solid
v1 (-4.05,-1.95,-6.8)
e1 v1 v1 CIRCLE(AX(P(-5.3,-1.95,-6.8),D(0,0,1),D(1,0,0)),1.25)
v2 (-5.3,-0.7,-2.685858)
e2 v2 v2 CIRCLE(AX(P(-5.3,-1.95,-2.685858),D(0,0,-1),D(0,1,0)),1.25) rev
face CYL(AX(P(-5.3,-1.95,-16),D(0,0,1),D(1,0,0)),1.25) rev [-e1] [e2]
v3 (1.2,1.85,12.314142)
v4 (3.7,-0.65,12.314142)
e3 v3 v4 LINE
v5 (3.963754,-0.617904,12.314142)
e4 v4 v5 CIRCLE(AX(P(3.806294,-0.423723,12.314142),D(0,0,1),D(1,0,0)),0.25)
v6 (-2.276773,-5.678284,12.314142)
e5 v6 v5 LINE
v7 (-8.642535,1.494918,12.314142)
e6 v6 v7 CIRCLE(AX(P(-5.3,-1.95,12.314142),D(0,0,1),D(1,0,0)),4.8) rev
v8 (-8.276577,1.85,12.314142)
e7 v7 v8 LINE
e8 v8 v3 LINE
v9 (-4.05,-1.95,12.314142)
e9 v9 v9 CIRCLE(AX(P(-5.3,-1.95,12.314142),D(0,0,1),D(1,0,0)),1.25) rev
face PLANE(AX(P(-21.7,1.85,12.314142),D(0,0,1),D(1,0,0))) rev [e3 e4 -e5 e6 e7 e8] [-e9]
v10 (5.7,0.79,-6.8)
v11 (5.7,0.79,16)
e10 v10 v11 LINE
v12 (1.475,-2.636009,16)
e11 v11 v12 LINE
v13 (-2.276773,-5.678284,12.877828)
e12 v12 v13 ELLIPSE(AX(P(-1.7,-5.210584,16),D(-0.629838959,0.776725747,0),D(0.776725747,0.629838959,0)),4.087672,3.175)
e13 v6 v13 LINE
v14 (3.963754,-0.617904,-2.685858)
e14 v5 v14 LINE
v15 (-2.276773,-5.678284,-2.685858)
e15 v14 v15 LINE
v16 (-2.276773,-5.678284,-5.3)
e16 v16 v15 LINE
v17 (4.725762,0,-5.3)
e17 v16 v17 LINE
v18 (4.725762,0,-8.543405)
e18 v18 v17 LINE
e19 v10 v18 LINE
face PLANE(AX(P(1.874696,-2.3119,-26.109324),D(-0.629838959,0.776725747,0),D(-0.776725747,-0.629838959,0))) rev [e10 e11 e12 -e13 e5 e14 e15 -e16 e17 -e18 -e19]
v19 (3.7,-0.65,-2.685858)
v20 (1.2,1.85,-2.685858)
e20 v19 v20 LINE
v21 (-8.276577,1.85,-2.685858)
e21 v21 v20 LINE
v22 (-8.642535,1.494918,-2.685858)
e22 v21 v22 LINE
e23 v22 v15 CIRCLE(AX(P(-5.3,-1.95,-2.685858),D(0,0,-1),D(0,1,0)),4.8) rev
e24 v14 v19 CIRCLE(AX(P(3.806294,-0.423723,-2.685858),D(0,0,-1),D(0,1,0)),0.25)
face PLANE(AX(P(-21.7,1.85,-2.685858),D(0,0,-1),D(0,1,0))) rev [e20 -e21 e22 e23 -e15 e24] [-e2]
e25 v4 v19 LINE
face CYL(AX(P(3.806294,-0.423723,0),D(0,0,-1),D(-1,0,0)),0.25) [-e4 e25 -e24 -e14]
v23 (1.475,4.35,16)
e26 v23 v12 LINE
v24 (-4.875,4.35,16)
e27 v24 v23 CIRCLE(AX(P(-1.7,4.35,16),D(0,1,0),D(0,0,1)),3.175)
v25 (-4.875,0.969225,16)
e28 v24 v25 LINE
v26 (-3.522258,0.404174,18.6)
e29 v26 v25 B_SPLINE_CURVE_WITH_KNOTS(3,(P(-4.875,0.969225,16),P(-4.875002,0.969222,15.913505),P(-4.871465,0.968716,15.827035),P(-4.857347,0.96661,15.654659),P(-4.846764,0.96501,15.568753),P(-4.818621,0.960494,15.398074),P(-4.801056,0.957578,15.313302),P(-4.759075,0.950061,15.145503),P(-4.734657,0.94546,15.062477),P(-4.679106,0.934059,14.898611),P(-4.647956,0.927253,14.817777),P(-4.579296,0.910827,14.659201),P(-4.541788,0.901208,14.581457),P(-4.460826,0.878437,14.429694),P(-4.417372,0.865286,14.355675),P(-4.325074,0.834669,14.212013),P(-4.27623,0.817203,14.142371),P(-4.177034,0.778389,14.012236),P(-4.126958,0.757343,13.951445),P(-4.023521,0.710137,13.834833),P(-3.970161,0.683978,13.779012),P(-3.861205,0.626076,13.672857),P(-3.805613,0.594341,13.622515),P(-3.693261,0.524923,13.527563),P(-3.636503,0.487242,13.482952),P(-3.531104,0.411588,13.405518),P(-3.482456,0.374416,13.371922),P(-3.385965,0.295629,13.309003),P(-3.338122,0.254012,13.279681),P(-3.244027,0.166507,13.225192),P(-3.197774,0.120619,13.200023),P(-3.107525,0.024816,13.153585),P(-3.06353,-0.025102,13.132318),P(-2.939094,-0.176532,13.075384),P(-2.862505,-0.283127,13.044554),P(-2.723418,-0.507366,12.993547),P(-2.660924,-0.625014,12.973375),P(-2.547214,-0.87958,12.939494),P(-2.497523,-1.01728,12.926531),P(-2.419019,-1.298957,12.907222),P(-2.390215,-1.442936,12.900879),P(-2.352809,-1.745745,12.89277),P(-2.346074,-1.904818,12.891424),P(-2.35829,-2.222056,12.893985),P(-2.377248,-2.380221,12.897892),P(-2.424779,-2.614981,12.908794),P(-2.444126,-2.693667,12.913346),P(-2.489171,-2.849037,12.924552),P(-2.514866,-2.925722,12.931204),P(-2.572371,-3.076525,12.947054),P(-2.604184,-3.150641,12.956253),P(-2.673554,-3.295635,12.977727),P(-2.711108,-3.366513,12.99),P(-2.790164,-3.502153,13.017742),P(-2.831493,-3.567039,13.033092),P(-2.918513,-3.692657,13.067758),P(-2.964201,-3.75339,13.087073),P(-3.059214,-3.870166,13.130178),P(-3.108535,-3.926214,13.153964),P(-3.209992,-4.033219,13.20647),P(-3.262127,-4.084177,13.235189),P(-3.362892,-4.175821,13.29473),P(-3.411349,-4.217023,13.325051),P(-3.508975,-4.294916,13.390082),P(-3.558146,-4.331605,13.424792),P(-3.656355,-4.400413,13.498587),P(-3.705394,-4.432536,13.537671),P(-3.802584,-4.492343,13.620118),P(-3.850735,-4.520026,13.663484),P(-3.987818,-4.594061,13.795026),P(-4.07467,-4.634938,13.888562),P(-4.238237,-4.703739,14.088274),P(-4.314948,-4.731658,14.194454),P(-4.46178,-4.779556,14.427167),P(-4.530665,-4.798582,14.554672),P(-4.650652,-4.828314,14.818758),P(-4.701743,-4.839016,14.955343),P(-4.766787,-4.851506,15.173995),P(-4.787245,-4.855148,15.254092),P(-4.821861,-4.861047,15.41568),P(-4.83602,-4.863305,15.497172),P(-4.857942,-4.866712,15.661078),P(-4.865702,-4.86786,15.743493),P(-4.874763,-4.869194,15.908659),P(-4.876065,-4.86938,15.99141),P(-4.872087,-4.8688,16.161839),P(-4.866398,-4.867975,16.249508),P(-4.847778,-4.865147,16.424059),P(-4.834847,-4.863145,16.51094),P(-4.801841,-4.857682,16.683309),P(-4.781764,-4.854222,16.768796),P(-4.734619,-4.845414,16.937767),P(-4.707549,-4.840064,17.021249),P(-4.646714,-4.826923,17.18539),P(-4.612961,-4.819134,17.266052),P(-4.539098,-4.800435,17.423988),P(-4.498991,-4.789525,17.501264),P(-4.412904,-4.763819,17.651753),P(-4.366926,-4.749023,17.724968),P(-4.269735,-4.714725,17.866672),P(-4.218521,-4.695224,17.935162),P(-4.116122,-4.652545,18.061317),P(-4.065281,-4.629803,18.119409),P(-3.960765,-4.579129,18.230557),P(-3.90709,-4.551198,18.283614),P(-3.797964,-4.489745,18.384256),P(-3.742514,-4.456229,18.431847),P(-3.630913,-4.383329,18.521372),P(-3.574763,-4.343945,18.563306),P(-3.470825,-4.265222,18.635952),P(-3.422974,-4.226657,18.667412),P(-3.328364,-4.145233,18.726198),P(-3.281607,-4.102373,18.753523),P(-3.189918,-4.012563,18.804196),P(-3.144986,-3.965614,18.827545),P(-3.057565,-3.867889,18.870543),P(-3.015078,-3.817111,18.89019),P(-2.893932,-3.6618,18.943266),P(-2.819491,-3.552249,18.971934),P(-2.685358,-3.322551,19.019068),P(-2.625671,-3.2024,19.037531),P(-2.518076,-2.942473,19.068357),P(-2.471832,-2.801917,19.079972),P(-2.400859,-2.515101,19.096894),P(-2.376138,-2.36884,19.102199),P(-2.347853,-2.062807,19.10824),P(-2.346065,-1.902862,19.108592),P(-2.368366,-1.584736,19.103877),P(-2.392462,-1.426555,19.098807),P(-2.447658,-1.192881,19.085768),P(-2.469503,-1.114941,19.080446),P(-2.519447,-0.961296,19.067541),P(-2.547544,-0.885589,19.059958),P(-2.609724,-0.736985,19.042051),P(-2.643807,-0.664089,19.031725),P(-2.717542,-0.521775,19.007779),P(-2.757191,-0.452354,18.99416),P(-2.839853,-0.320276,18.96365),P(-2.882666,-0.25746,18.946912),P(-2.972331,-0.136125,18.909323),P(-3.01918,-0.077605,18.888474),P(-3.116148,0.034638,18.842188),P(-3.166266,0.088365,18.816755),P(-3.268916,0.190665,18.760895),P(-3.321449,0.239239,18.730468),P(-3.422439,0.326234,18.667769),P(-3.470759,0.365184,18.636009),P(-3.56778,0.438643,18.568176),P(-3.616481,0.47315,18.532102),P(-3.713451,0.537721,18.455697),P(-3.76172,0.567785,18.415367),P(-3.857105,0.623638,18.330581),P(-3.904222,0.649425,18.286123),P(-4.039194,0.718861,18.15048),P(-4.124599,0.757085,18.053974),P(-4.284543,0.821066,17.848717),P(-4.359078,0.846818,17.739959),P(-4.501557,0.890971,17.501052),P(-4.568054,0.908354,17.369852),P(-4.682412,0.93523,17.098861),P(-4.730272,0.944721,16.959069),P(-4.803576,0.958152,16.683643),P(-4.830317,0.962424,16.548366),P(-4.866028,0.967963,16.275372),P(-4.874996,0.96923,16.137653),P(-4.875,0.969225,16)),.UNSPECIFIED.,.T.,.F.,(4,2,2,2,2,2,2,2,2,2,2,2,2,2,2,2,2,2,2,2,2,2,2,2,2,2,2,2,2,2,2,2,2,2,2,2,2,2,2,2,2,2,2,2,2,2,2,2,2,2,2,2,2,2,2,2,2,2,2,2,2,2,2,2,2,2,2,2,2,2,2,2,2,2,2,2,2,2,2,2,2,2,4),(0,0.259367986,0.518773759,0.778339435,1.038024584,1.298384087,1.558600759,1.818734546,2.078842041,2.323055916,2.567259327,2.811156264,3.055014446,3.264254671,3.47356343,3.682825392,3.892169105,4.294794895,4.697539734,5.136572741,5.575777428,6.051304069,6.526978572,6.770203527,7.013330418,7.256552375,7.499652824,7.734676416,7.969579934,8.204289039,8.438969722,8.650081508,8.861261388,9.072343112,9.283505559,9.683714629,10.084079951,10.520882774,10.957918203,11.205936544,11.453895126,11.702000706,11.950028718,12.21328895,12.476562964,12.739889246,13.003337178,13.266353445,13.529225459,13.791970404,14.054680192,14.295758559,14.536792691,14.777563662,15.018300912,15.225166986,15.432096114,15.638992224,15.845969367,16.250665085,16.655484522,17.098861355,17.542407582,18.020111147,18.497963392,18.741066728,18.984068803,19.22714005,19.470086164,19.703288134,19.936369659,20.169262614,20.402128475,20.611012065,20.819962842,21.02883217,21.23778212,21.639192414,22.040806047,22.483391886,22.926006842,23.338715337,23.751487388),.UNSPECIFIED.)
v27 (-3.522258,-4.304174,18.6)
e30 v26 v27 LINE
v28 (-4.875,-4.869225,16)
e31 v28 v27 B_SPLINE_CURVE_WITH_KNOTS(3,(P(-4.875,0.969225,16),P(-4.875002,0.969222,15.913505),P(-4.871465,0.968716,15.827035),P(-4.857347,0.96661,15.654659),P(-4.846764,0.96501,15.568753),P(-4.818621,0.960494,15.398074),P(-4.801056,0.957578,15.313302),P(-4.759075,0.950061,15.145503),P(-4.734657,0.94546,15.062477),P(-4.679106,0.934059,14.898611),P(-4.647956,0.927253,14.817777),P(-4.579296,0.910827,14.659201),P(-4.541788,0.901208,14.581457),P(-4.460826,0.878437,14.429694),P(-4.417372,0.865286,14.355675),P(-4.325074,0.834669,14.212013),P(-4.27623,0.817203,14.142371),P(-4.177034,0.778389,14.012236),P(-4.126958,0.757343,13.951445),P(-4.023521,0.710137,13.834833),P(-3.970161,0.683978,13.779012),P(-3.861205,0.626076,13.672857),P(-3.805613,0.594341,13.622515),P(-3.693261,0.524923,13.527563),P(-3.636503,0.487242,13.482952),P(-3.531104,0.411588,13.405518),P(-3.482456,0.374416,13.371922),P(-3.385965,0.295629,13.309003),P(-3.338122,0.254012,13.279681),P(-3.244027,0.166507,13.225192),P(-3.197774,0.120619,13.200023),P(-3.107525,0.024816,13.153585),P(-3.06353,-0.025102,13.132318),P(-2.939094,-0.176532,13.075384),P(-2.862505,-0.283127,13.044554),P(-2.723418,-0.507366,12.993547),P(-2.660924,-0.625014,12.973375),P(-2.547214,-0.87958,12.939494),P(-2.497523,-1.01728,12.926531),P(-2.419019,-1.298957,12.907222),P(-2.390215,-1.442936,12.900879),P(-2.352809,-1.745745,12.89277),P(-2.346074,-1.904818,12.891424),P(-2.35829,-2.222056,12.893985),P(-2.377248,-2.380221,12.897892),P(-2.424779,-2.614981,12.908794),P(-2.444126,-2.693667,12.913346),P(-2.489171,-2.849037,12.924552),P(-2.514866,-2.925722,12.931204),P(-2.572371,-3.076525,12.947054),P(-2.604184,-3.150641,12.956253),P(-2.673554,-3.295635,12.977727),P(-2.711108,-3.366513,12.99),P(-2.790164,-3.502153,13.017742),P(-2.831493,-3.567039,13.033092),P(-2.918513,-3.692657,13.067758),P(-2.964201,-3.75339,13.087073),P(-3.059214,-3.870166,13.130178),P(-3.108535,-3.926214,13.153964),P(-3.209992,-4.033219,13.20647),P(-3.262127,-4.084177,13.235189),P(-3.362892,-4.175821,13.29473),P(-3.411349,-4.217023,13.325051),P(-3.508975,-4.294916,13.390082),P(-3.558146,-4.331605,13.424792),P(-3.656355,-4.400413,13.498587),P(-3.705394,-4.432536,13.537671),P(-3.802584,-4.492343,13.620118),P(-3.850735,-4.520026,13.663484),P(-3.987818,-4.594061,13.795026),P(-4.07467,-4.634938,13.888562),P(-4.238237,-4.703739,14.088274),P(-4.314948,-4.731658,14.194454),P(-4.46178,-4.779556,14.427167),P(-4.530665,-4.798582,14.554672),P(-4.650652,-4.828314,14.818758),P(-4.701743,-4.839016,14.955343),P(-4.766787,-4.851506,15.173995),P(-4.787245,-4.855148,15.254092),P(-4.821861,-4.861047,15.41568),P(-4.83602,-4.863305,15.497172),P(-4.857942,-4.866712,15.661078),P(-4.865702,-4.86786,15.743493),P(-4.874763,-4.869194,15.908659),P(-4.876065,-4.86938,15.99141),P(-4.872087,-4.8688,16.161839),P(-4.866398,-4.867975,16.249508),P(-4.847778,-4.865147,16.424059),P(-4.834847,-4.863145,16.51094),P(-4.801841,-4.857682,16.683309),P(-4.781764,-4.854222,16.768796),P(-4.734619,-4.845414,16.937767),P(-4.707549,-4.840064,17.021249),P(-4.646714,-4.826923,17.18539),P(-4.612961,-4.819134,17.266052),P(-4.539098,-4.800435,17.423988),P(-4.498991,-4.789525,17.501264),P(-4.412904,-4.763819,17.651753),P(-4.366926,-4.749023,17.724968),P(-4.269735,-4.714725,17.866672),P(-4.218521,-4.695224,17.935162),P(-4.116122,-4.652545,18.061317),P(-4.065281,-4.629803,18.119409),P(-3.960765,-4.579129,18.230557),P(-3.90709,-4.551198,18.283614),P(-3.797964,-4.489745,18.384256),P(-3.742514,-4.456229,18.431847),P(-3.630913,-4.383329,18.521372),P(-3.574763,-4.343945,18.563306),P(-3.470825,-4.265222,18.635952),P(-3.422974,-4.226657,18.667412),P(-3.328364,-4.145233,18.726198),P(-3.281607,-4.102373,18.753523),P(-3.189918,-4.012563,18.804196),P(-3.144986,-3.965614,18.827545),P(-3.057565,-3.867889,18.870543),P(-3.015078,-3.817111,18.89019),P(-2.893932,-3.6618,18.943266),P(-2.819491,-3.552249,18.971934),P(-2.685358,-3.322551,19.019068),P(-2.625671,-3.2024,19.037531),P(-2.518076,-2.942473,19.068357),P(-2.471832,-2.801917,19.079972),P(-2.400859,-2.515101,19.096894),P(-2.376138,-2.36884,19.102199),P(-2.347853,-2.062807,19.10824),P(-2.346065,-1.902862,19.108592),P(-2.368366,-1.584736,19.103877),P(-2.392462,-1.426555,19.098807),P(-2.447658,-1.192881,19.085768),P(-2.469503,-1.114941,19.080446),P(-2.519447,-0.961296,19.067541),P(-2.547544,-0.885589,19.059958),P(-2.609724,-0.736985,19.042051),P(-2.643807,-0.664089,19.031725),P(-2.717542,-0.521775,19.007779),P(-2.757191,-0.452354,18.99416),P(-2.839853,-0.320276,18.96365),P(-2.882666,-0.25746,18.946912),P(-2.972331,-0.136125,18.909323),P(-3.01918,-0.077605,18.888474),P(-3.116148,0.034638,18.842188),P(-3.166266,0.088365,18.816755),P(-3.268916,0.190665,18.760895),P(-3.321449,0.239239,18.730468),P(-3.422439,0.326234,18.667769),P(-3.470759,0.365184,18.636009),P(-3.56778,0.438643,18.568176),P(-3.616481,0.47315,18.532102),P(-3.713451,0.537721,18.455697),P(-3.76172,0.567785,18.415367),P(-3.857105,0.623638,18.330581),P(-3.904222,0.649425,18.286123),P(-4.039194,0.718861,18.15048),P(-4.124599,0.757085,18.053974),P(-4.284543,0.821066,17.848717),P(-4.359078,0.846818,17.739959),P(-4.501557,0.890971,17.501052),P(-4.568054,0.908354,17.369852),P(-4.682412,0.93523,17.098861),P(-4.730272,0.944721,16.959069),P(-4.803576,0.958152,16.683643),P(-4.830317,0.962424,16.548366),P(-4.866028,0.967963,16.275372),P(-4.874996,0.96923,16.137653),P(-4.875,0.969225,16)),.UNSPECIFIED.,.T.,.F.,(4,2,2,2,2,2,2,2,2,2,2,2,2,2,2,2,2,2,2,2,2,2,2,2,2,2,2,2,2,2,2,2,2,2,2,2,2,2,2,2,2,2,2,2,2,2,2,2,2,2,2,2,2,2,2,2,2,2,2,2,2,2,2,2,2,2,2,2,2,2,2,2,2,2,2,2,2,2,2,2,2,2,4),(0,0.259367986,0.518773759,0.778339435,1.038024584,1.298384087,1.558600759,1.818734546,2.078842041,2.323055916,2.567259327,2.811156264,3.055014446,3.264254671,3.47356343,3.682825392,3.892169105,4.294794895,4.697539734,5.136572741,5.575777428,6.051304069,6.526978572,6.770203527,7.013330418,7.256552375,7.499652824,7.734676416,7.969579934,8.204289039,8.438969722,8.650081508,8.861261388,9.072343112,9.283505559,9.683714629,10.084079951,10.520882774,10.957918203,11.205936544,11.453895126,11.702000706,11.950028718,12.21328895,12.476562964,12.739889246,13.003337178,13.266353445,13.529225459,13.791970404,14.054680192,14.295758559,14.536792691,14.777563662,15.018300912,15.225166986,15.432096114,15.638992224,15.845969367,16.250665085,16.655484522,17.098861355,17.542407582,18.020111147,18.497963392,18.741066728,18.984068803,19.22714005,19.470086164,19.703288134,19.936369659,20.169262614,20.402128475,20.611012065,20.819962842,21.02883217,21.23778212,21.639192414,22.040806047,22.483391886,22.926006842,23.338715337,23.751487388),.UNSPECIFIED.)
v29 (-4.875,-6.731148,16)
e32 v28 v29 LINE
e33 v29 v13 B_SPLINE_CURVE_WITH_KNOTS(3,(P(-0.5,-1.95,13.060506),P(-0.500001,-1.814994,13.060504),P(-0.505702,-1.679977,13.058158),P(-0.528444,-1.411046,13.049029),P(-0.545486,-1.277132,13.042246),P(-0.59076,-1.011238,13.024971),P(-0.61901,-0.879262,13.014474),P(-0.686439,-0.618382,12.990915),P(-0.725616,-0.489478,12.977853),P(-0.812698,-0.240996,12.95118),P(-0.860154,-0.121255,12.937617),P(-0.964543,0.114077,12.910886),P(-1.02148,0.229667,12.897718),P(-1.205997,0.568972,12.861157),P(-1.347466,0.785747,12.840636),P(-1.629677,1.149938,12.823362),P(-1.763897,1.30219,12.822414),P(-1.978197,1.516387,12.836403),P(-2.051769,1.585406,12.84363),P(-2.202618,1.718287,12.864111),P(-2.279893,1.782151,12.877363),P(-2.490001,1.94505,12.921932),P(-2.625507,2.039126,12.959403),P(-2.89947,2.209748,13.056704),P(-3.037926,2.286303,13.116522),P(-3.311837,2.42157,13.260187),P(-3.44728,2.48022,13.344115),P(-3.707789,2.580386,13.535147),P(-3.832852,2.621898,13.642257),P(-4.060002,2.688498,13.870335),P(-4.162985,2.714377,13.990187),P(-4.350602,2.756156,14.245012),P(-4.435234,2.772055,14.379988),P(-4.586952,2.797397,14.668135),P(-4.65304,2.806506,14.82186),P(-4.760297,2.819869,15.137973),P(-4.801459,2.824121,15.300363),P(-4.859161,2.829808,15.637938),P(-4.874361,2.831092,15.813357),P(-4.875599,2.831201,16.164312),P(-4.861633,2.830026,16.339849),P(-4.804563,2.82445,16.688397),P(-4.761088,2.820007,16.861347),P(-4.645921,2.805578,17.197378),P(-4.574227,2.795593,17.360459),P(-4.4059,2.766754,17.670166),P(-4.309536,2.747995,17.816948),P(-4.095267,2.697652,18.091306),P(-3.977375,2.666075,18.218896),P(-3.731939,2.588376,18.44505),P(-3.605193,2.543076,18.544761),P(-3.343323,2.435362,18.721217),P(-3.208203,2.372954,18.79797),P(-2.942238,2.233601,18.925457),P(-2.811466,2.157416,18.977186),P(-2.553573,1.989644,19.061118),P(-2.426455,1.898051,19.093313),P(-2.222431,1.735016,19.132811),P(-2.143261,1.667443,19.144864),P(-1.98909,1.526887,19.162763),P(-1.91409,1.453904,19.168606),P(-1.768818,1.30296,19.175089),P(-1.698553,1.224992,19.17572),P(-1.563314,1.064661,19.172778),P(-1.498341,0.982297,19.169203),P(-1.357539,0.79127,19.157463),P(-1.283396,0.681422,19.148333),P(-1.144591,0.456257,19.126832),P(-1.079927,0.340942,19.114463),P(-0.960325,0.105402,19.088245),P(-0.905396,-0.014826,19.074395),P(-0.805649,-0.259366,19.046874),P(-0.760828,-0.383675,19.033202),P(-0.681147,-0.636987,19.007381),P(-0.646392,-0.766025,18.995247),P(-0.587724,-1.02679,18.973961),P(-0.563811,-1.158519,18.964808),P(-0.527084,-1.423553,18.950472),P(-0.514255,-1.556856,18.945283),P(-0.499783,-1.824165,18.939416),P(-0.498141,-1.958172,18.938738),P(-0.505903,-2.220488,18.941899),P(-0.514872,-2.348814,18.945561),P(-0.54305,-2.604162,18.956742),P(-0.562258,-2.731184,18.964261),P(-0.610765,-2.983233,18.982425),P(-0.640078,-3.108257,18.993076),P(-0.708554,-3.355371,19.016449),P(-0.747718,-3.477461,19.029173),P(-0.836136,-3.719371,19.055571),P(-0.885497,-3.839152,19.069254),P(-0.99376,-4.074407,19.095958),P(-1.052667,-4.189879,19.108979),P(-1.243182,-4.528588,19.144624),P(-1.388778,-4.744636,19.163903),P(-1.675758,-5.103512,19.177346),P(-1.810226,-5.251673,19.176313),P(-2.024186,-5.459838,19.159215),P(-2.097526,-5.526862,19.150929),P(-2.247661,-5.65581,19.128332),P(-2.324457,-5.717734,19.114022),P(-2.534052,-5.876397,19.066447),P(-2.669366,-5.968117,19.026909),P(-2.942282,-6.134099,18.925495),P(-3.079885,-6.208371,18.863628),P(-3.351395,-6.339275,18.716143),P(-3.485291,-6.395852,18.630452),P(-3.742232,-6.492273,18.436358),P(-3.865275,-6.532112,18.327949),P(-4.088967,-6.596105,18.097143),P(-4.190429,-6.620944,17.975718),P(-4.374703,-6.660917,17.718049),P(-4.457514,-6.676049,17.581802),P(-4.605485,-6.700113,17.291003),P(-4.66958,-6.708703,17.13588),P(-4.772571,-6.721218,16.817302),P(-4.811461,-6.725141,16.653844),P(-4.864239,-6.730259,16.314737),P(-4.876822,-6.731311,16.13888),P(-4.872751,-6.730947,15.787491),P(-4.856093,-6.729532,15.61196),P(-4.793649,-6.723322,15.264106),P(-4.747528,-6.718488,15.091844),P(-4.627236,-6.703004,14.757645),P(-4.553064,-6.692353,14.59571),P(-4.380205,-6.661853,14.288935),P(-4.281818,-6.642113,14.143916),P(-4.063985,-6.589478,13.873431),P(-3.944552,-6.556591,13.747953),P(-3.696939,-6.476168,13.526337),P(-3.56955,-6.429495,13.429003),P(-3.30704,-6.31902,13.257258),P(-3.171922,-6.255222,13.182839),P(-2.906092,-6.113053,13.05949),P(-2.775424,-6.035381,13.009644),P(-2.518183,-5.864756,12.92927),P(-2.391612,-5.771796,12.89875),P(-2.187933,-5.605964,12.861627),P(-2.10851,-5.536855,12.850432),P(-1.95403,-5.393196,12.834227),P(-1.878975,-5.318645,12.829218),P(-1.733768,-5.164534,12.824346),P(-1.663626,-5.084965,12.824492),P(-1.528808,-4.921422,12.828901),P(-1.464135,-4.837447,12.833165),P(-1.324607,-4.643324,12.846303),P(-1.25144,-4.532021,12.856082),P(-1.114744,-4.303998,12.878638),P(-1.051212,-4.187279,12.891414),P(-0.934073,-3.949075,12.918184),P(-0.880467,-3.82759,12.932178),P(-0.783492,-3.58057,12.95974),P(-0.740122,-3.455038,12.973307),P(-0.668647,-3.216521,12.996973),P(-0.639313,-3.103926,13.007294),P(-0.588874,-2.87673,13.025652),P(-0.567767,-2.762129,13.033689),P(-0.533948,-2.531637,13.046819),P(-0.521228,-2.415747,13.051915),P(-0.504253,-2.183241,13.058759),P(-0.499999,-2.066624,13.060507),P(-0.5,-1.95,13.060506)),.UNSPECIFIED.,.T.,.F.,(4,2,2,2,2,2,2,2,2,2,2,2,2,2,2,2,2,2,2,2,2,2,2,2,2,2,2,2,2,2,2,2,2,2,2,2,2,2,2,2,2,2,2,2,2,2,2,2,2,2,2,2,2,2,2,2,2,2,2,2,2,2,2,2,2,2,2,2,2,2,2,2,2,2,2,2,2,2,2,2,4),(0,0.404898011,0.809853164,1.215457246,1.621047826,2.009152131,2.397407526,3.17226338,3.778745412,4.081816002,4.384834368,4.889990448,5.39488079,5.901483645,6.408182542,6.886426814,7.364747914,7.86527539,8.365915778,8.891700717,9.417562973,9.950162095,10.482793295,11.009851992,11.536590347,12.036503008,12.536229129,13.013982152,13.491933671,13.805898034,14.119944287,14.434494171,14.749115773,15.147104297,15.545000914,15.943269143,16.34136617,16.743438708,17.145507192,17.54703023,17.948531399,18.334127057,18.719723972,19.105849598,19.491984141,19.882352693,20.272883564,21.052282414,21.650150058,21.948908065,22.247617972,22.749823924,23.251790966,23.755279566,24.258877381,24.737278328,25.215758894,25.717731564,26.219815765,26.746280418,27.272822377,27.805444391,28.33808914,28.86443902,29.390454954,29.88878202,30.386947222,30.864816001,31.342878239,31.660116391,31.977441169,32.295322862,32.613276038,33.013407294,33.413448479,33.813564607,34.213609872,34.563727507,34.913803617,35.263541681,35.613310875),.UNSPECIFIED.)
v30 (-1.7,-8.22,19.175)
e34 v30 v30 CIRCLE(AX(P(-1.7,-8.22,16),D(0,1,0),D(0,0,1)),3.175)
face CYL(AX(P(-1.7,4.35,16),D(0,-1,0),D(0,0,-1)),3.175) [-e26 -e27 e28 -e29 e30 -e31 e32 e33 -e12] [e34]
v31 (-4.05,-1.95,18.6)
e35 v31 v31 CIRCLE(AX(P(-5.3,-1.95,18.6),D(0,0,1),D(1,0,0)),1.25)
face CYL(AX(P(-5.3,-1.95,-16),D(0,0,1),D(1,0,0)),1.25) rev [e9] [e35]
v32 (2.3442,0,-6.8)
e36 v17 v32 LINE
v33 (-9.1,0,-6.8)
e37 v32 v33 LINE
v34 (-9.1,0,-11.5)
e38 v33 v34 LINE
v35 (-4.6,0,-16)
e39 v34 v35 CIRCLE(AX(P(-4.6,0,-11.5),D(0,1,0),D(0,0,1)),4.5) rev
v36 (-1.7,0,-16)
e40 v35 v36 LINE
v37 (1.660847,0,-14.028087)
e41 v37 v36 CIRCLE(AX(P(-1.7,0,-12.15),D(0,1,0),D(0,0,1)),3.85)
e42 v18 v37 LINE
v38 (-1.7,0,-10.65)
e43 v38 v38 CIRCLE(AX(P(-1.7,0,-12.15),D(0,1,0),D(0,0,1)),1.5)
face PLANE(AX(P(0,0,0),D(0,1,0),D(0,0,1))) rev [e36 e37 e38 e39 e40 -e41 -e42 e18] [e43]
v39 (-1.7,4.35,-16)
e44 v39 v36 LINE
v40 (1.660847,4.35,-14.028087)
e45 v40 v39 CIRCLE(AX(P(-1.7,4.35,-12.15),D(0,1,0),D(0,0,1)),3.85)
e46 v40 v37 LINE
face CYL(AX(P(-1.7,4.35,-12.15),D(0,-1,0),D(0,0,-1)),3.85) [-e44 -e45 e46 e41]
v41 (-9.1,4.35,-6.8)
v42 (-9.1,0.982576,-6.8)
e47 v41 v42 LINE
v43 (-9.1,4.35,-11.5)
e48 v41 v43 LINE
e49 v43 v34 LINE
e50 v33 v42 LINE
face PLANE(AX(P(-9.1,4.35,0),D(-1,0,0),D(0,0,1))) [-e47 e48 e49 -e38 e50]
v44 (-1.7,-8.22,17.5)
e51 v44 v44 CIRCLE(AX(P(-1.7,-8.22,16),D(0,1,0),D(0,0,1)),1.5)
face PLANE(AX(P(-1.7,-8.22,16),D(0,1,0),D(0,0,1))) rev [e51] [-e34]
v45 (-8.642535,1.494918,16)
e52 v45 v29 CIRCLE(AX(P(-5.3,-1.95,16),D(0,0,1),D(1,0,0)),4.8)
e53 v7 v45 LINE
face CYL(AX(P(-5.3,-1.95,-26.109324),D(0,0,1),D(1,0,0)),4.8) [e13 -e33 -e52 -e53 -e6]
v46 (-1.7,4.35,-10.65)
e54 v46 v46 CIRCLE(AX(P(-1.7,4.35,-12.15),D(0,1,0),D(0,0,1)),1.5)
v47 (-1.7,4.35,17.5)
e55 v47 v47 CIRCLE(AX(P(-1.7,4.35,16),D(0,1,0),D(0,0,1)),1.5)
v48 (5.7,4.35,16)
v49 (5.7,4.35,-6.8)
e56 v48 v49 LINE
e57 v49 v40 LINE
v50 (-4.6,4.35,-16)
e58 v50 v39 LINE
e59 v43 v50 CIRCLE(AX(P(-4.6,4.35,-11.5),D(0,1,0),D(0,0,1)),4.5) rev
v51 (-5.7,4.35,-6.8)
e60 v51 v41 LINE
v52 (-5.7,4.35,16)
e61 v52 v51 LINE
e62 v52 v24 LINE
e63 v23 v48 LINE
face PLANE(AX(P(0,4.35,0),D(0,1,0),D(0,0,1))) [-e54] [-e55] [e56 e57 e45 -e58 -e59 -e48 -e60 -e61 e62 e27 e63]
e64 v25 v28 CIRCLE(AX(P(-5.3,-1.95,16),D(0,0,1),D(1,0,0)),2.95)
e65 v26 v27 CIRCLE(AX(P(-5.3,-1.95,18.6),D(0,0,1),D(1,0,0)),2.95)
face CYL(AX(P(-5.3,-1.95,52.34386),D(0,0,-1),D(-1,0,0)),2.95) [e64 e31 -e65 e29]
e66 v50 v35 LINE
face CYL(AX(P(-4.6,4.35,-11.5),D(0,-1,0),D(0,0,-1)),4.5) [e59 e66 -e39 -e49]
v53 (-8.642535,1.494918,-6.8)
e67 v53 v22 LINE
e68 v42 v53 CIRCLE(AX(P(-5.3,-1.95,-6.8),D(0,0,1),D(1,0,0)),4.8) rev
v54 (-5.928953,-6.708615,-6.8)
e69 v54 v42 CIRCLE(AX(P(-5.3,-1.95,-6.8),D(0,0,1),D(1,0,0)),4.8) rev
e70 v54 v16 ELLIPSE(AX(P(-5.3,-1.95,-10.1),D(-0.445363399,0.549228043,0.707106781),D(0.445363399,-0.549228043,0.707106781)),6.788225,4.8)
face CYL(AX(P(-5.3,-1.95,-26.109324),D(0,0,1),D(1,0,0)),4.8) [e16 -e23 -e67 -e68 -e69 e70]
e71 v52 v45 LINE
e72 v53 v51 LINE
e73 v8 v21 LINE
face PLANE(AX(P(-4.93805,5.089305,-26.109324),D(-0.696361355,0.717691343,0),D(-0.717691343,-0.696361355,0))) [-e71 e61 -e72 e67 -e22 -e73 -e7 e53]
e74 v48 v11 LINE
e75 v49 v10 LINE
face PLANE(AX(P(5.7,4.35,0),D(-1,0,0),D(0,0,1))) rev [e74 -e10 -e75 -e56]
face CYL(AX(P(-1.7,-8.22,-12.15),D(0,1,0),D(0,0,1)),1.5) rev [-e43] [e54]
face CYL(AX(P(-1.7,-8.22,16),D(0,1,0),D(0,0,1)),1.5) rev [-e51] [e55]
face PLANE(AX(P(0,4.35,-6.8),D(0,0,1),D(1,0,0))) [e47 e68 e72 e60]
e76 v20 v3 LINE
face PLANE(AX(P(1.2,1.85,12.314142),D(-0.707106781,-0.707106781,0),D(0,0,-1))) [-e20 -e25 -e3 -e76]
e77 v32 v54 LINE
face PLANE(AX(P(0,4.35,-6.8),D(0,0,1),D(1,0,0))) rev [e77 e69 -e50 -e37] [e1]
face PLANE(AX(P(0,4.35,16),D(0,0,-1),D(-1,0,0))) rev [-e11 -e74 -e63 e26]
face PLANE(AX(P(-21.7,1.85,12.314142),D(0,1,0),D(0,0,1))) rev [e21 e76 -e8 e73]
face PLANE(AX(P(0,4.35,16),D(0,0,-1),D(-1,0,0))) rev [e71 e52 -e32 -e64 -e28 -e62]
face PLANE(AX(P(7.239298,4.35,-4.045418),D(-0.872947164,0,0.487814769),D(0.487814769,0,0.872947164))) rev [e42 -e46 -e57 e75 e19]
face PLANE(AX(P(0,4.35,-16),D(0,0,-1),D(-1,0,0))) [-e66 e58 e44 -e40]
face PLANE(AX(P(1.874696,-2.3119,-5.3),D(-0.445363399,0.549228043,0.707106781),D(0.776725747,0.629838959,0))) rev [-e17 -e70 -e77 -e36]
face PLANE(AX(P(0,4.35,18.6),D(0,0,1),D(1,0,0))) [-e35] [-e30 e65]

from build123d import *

# Parameters (mm, degrees)
BOSS_EXTRUDE1_DEPTH = 4.35
BOSS_EXTRUDE2_DEPTH = 22.8
CUT_EXTRUDE1_DEPTH  = 35.228241264
BOSS_EXTRUDE3_START = -12.57
SKETCH5_R           = 3.175
BOSS_EXTRUDE3_DEPTH = 12.57
SKETCH6_R           = 2.95
BOSS_EXTRUDE4_DEPTH = 2.6
CHAMFER1_SIZE       = 1.5
SKETCH7_R           = 1.5
CUT_EXTRUDE2_DEPTH  = 26.053852665
SKETCH8_R           = 1.25
CUT_EXTRUDE3_DEPTH  = 37.969425255
SKETCH9_W           = 15
SKETCH9_H           = 8.6
CUT_EXTRUDE4_DEPTH  = 25.4
CHAMFER2_SIZE       = 2.5
FILLET1_R           = 0.25


with BuildPart() as part:
    # Sketch2 → Boss-Extrude1 (new body)
    with BuildSketch(Plane(origin=(0, 0, 0), x_dir=(1, 0, 0), z_dir=(0, 1, 0))):
        with BuildLine():
            ThreePointArc((1.475, -16), (-1.7, -12.825), (-4.875, -16))
            Line((-4.875, -16), (1.475, -16))
        make_face()
        with BuildLine():
            Line((1.475, -16), (-4.875, -16))
            ThreePointArc((-4.875, -16), (-1.7, -19.175), (1.475, -16))
        make_face()
        with BuildLine():
            Line((-5.7, 15.863484846), (-5.7, 6.8))
            Line((-5.7, 6.8), (-5.7, -16))
            Line((-5.7, -16), (-4.875, -16))
            ThreePointArc((-4.875, -16), (-1.7, -12.825), (1.475, -16))
            Line((1.475, -16), (5.7, -16))
            Line((5.7, -16), (5.7, 6.8))
            Line((5.7, 6.8), (1.660846582, 14.02808686))
            ThreePointArc((1.660846582, 14.02808686), (0.248315373, 15.470627532), (-1.7, 16))
            Line((-1.7, 16), (-4.6, 16))
            ThreePointArc((-4.6, 16), (-5.154219358, 15.965740801), (-5.7, 15.863484846))
        make_face()
        with BuildLine():
            Line((-9.1, 6.8), (-5.7, 6.8))
            Line((-5.7, 6.8), (-5.7, 15.863484846))
            ThreePointArc((-5.7, 15.863484846), (-8.14964787, 14.265863337), (-9.1, 11.5))
            Line((-9.1, 11.5), (-9.1, 6.8))
        make_face()
    extrude(amount=BOSS_EXTRUDE1_DEPTH)

    # Sketch3 → Boss-Extrude2 (add)
    with BuildSketch(Plane.XY.offset(16)):
        with BuildLine():
            Line((5.7, 0.79), (-4.875, 4.092368421))
            Line((-4.875, 4.092368421), (-4.875, 2.831147875))
            ThreePointArc((-4.875, 2.831147875), (-1.758813758, 1.290370349), (-0.5, -1.95))
            ThreePointArc((-0.5, -1.95), (-0.966901247, -4.015007311), (-2.276772998, -5.678283585))
            Line((-2.276772998, -5.678283585), (5.7, 0.79))
        make_face()
        with BuildLine():
            ThreePointArc((-5.7, 2.833304297), (-7.287324911, 2.419272216), (-8.642534504, 1.494918444))
            ThreePointArc((-8.642534504, 1.494918444), (-8.890152665, -5.136032618), (-2.276772998, -5.678283585))
            ThreePointArc((-2.276772998, -5.678283585), (-0.966901247, -4.015007311), (-0.5, -1.95))
            ThreePointArc((-0.5, -1.95), (-1.758813758, 1.290370349), (-4.875, 2.831147875))
            Line((-4.875, 2.831147875), (-4.875, 0))
            Line((-4.875, 0), (-5.7, 0))
            Line((-5.7, 0), (-5.7, 2.833304297))
        make_face()
        with BuildLine():
            ThreePointArc((-4.875, 2.831147875), (-5.287453585, 2.849983603), (-5.7, 2.833304297))
            Line((-5.7, 2.833304297), (-5.7, 0))
            Line((-5.7, 0), (-4.875, 0))
            Line((-4.875, 0), (-4.875, 2.831147875))
        make_face()
        with BuildLine():
            Line((-4.875, 4.092368421), (-5.7, 4.35))
            Line((-5.7, 4.35), (-5.7, 2.833304297))
            ThreePointArc((-5.7, 2.833304297), (-5.287453585, 2.849983603), (-4.875, 2.831147875))
            Line((-4.875, 2.831147875), (-4.875, 4.092368421))
        make_face()
        with BuildLine():
            Line((-5.7, 2.833304297), (-5.7, 4.35))
            Line((-5.7, 4.35), (-8.642534504, 1.494918444))
            ThreePointArc((-8.642534504, 1.494918444), (-7.287324911, 2.419272216), (-5.7, 2.833304297))
        make_face()
    extrude(amount=-BOSS_EXTRUDE2_DEPTH)

    # Sketch4 → Cut-Extrude1 (cut, through all)
    with BuildSketch(Plane.XY.offset(16)):
        Polygon((5.7, 0), (5.7, 0.79), (4.725761535, 0), align=None)
    extrude(amount=-CUT_EXTRUDE1_DEPTH, mode=Mode.SUBTRACT)

    # Sketch5 → Boss-Extrude3 (add)
    with BuildSketch(Plane(origin=(0, 4.35, 0), x_dir=(1, 0, 0), z_dir=(0, 1, 0)).offset(BOSS_EXTRUDE3_START)):
        with Locations(Location((-1.7, -16, 0), (0, 0, 100.46651796))):
            Circle(SKETCH5_R)
    extrude(amount=BOSS_EXTRUDE3_DEPTH)

    # Sketch6 → Boss-Extrude4 (add)
    with BuildSketch(Plane.XY.offset(16)):
        with Locations((-5.3, -1.95)):
            Circle(SKETCH6_R)
    extrude(amount=BOSS_EXTRUDE4_DEPTH)

    # Chamfer1
    # the kernel refuses this chamfer: 1.5 mm, written as the material it takes off along each edge
    with BuildSketch(Plane(origin=(-5.273011582, -8.107902789, -6.8), x_dir=(0.017317974295388713, -0.021356755298707605, 0.9996219169112968), z_dir=(0.7767257469610731, 0.6298389587884852, 0))) as chamfer1_piece_1_section:
        Polygon((CHAMFER1_SIZE * 0.999621916911, -CHAMFER1_SIZE * 0.0274958766106), (-CHAMFER1_SIZE * 0.0274958766106, -CHAMFER1_SIZE * 0.999621916911), (0, 0), align=None)
    chamfer1_piece_1 = extrude(amount=16.730502051, mode=Mode.PRIVATE)
    chamfer1_piece_1 = split(chamfer1_piece_1, bisect_by=Plane(origin=(-2.677352376, 0, -6.368001428), z_dir=(0, -1, 0)), keep=Keep.TOP, mode=Mode.PRIVATE)
    add(chamfer1_piece_1, mode=Mode.SUBTRACT)

    # Sketch7 → Cut-Extrude2 (cut, through all)
    with BuildSketch(Plane(origin=(0, 4.35, 0), x_dir=(1, 0, 0), z_dir=(0, 1, 0))):
        with Locations(Location((-1.7, 12.15, 0), (0, 0, 270))):
            Circle(SKETCH7_R)
        with Locations(Location((-1.7, -16, 0), (0, 0, 270))):
            Circle(SKETCH7_R)
    extrude(amount=-CUT_EXTRUDE2_DEPTH, mode=Mode.SUBTRACT)

    # Sketch8 → Cut-Extrude3 (cut, through all)
    with BuildSketch(Plane.XY.offset(18.6)):
        with Locations((-5.3, -1.95)):
            Circle(SKETCH8_R)
    extrude(amount=-CUT_EXTRUDE3_DEPTH, mode=Mode.SUBTRACT)

    # Sketch9 → Cut-Extrude4 (cut)
    with BuildSketch(Plane(origin=(3.7, 0, 0), x_dir=(0, 0, -1), z_dir=(1, 0, 0))):
        with Locations((-4.814141793, -2.45)):
            Rectangle(SKETCH9_W, SKETCH9_H)
    extrude(amount=-CUT_EXTRUDE4_DEPTH, mode=Mode.SUBTRACT)

    # Chamfer2
    chamfer2_edges = [part.edges().sort_by_distance(p)[0] for p in [
        (3.7, 1.85, 4.814141793),
    ]]
    chamfer(chamfer2_edges, length=CHAMFER2_SIZE)

    # Fillet1
    # the kernel refuses this fillet: 0.25 mm, written as the material it takes off along each edge
    with BuildSketch(Plane(origin=(3.7, -0.831779531, 12.314141793), x_dir=(0, 1, 0), z_dir=(0, 0, -1))) as fillet1_piece_1:
        with BuildLine():
            CenterArc((0.408056999, 0.106294437), FILLET1_R, 140.961757793, 64.20015701)
            Line((0.213875562, 0.263754177), (0, 0))
            Line((0, 0), (0.181779531, 0))
        make_face()
    extrude(amount=15, mode=Mode.SUBTRACT)


solid = part.part
